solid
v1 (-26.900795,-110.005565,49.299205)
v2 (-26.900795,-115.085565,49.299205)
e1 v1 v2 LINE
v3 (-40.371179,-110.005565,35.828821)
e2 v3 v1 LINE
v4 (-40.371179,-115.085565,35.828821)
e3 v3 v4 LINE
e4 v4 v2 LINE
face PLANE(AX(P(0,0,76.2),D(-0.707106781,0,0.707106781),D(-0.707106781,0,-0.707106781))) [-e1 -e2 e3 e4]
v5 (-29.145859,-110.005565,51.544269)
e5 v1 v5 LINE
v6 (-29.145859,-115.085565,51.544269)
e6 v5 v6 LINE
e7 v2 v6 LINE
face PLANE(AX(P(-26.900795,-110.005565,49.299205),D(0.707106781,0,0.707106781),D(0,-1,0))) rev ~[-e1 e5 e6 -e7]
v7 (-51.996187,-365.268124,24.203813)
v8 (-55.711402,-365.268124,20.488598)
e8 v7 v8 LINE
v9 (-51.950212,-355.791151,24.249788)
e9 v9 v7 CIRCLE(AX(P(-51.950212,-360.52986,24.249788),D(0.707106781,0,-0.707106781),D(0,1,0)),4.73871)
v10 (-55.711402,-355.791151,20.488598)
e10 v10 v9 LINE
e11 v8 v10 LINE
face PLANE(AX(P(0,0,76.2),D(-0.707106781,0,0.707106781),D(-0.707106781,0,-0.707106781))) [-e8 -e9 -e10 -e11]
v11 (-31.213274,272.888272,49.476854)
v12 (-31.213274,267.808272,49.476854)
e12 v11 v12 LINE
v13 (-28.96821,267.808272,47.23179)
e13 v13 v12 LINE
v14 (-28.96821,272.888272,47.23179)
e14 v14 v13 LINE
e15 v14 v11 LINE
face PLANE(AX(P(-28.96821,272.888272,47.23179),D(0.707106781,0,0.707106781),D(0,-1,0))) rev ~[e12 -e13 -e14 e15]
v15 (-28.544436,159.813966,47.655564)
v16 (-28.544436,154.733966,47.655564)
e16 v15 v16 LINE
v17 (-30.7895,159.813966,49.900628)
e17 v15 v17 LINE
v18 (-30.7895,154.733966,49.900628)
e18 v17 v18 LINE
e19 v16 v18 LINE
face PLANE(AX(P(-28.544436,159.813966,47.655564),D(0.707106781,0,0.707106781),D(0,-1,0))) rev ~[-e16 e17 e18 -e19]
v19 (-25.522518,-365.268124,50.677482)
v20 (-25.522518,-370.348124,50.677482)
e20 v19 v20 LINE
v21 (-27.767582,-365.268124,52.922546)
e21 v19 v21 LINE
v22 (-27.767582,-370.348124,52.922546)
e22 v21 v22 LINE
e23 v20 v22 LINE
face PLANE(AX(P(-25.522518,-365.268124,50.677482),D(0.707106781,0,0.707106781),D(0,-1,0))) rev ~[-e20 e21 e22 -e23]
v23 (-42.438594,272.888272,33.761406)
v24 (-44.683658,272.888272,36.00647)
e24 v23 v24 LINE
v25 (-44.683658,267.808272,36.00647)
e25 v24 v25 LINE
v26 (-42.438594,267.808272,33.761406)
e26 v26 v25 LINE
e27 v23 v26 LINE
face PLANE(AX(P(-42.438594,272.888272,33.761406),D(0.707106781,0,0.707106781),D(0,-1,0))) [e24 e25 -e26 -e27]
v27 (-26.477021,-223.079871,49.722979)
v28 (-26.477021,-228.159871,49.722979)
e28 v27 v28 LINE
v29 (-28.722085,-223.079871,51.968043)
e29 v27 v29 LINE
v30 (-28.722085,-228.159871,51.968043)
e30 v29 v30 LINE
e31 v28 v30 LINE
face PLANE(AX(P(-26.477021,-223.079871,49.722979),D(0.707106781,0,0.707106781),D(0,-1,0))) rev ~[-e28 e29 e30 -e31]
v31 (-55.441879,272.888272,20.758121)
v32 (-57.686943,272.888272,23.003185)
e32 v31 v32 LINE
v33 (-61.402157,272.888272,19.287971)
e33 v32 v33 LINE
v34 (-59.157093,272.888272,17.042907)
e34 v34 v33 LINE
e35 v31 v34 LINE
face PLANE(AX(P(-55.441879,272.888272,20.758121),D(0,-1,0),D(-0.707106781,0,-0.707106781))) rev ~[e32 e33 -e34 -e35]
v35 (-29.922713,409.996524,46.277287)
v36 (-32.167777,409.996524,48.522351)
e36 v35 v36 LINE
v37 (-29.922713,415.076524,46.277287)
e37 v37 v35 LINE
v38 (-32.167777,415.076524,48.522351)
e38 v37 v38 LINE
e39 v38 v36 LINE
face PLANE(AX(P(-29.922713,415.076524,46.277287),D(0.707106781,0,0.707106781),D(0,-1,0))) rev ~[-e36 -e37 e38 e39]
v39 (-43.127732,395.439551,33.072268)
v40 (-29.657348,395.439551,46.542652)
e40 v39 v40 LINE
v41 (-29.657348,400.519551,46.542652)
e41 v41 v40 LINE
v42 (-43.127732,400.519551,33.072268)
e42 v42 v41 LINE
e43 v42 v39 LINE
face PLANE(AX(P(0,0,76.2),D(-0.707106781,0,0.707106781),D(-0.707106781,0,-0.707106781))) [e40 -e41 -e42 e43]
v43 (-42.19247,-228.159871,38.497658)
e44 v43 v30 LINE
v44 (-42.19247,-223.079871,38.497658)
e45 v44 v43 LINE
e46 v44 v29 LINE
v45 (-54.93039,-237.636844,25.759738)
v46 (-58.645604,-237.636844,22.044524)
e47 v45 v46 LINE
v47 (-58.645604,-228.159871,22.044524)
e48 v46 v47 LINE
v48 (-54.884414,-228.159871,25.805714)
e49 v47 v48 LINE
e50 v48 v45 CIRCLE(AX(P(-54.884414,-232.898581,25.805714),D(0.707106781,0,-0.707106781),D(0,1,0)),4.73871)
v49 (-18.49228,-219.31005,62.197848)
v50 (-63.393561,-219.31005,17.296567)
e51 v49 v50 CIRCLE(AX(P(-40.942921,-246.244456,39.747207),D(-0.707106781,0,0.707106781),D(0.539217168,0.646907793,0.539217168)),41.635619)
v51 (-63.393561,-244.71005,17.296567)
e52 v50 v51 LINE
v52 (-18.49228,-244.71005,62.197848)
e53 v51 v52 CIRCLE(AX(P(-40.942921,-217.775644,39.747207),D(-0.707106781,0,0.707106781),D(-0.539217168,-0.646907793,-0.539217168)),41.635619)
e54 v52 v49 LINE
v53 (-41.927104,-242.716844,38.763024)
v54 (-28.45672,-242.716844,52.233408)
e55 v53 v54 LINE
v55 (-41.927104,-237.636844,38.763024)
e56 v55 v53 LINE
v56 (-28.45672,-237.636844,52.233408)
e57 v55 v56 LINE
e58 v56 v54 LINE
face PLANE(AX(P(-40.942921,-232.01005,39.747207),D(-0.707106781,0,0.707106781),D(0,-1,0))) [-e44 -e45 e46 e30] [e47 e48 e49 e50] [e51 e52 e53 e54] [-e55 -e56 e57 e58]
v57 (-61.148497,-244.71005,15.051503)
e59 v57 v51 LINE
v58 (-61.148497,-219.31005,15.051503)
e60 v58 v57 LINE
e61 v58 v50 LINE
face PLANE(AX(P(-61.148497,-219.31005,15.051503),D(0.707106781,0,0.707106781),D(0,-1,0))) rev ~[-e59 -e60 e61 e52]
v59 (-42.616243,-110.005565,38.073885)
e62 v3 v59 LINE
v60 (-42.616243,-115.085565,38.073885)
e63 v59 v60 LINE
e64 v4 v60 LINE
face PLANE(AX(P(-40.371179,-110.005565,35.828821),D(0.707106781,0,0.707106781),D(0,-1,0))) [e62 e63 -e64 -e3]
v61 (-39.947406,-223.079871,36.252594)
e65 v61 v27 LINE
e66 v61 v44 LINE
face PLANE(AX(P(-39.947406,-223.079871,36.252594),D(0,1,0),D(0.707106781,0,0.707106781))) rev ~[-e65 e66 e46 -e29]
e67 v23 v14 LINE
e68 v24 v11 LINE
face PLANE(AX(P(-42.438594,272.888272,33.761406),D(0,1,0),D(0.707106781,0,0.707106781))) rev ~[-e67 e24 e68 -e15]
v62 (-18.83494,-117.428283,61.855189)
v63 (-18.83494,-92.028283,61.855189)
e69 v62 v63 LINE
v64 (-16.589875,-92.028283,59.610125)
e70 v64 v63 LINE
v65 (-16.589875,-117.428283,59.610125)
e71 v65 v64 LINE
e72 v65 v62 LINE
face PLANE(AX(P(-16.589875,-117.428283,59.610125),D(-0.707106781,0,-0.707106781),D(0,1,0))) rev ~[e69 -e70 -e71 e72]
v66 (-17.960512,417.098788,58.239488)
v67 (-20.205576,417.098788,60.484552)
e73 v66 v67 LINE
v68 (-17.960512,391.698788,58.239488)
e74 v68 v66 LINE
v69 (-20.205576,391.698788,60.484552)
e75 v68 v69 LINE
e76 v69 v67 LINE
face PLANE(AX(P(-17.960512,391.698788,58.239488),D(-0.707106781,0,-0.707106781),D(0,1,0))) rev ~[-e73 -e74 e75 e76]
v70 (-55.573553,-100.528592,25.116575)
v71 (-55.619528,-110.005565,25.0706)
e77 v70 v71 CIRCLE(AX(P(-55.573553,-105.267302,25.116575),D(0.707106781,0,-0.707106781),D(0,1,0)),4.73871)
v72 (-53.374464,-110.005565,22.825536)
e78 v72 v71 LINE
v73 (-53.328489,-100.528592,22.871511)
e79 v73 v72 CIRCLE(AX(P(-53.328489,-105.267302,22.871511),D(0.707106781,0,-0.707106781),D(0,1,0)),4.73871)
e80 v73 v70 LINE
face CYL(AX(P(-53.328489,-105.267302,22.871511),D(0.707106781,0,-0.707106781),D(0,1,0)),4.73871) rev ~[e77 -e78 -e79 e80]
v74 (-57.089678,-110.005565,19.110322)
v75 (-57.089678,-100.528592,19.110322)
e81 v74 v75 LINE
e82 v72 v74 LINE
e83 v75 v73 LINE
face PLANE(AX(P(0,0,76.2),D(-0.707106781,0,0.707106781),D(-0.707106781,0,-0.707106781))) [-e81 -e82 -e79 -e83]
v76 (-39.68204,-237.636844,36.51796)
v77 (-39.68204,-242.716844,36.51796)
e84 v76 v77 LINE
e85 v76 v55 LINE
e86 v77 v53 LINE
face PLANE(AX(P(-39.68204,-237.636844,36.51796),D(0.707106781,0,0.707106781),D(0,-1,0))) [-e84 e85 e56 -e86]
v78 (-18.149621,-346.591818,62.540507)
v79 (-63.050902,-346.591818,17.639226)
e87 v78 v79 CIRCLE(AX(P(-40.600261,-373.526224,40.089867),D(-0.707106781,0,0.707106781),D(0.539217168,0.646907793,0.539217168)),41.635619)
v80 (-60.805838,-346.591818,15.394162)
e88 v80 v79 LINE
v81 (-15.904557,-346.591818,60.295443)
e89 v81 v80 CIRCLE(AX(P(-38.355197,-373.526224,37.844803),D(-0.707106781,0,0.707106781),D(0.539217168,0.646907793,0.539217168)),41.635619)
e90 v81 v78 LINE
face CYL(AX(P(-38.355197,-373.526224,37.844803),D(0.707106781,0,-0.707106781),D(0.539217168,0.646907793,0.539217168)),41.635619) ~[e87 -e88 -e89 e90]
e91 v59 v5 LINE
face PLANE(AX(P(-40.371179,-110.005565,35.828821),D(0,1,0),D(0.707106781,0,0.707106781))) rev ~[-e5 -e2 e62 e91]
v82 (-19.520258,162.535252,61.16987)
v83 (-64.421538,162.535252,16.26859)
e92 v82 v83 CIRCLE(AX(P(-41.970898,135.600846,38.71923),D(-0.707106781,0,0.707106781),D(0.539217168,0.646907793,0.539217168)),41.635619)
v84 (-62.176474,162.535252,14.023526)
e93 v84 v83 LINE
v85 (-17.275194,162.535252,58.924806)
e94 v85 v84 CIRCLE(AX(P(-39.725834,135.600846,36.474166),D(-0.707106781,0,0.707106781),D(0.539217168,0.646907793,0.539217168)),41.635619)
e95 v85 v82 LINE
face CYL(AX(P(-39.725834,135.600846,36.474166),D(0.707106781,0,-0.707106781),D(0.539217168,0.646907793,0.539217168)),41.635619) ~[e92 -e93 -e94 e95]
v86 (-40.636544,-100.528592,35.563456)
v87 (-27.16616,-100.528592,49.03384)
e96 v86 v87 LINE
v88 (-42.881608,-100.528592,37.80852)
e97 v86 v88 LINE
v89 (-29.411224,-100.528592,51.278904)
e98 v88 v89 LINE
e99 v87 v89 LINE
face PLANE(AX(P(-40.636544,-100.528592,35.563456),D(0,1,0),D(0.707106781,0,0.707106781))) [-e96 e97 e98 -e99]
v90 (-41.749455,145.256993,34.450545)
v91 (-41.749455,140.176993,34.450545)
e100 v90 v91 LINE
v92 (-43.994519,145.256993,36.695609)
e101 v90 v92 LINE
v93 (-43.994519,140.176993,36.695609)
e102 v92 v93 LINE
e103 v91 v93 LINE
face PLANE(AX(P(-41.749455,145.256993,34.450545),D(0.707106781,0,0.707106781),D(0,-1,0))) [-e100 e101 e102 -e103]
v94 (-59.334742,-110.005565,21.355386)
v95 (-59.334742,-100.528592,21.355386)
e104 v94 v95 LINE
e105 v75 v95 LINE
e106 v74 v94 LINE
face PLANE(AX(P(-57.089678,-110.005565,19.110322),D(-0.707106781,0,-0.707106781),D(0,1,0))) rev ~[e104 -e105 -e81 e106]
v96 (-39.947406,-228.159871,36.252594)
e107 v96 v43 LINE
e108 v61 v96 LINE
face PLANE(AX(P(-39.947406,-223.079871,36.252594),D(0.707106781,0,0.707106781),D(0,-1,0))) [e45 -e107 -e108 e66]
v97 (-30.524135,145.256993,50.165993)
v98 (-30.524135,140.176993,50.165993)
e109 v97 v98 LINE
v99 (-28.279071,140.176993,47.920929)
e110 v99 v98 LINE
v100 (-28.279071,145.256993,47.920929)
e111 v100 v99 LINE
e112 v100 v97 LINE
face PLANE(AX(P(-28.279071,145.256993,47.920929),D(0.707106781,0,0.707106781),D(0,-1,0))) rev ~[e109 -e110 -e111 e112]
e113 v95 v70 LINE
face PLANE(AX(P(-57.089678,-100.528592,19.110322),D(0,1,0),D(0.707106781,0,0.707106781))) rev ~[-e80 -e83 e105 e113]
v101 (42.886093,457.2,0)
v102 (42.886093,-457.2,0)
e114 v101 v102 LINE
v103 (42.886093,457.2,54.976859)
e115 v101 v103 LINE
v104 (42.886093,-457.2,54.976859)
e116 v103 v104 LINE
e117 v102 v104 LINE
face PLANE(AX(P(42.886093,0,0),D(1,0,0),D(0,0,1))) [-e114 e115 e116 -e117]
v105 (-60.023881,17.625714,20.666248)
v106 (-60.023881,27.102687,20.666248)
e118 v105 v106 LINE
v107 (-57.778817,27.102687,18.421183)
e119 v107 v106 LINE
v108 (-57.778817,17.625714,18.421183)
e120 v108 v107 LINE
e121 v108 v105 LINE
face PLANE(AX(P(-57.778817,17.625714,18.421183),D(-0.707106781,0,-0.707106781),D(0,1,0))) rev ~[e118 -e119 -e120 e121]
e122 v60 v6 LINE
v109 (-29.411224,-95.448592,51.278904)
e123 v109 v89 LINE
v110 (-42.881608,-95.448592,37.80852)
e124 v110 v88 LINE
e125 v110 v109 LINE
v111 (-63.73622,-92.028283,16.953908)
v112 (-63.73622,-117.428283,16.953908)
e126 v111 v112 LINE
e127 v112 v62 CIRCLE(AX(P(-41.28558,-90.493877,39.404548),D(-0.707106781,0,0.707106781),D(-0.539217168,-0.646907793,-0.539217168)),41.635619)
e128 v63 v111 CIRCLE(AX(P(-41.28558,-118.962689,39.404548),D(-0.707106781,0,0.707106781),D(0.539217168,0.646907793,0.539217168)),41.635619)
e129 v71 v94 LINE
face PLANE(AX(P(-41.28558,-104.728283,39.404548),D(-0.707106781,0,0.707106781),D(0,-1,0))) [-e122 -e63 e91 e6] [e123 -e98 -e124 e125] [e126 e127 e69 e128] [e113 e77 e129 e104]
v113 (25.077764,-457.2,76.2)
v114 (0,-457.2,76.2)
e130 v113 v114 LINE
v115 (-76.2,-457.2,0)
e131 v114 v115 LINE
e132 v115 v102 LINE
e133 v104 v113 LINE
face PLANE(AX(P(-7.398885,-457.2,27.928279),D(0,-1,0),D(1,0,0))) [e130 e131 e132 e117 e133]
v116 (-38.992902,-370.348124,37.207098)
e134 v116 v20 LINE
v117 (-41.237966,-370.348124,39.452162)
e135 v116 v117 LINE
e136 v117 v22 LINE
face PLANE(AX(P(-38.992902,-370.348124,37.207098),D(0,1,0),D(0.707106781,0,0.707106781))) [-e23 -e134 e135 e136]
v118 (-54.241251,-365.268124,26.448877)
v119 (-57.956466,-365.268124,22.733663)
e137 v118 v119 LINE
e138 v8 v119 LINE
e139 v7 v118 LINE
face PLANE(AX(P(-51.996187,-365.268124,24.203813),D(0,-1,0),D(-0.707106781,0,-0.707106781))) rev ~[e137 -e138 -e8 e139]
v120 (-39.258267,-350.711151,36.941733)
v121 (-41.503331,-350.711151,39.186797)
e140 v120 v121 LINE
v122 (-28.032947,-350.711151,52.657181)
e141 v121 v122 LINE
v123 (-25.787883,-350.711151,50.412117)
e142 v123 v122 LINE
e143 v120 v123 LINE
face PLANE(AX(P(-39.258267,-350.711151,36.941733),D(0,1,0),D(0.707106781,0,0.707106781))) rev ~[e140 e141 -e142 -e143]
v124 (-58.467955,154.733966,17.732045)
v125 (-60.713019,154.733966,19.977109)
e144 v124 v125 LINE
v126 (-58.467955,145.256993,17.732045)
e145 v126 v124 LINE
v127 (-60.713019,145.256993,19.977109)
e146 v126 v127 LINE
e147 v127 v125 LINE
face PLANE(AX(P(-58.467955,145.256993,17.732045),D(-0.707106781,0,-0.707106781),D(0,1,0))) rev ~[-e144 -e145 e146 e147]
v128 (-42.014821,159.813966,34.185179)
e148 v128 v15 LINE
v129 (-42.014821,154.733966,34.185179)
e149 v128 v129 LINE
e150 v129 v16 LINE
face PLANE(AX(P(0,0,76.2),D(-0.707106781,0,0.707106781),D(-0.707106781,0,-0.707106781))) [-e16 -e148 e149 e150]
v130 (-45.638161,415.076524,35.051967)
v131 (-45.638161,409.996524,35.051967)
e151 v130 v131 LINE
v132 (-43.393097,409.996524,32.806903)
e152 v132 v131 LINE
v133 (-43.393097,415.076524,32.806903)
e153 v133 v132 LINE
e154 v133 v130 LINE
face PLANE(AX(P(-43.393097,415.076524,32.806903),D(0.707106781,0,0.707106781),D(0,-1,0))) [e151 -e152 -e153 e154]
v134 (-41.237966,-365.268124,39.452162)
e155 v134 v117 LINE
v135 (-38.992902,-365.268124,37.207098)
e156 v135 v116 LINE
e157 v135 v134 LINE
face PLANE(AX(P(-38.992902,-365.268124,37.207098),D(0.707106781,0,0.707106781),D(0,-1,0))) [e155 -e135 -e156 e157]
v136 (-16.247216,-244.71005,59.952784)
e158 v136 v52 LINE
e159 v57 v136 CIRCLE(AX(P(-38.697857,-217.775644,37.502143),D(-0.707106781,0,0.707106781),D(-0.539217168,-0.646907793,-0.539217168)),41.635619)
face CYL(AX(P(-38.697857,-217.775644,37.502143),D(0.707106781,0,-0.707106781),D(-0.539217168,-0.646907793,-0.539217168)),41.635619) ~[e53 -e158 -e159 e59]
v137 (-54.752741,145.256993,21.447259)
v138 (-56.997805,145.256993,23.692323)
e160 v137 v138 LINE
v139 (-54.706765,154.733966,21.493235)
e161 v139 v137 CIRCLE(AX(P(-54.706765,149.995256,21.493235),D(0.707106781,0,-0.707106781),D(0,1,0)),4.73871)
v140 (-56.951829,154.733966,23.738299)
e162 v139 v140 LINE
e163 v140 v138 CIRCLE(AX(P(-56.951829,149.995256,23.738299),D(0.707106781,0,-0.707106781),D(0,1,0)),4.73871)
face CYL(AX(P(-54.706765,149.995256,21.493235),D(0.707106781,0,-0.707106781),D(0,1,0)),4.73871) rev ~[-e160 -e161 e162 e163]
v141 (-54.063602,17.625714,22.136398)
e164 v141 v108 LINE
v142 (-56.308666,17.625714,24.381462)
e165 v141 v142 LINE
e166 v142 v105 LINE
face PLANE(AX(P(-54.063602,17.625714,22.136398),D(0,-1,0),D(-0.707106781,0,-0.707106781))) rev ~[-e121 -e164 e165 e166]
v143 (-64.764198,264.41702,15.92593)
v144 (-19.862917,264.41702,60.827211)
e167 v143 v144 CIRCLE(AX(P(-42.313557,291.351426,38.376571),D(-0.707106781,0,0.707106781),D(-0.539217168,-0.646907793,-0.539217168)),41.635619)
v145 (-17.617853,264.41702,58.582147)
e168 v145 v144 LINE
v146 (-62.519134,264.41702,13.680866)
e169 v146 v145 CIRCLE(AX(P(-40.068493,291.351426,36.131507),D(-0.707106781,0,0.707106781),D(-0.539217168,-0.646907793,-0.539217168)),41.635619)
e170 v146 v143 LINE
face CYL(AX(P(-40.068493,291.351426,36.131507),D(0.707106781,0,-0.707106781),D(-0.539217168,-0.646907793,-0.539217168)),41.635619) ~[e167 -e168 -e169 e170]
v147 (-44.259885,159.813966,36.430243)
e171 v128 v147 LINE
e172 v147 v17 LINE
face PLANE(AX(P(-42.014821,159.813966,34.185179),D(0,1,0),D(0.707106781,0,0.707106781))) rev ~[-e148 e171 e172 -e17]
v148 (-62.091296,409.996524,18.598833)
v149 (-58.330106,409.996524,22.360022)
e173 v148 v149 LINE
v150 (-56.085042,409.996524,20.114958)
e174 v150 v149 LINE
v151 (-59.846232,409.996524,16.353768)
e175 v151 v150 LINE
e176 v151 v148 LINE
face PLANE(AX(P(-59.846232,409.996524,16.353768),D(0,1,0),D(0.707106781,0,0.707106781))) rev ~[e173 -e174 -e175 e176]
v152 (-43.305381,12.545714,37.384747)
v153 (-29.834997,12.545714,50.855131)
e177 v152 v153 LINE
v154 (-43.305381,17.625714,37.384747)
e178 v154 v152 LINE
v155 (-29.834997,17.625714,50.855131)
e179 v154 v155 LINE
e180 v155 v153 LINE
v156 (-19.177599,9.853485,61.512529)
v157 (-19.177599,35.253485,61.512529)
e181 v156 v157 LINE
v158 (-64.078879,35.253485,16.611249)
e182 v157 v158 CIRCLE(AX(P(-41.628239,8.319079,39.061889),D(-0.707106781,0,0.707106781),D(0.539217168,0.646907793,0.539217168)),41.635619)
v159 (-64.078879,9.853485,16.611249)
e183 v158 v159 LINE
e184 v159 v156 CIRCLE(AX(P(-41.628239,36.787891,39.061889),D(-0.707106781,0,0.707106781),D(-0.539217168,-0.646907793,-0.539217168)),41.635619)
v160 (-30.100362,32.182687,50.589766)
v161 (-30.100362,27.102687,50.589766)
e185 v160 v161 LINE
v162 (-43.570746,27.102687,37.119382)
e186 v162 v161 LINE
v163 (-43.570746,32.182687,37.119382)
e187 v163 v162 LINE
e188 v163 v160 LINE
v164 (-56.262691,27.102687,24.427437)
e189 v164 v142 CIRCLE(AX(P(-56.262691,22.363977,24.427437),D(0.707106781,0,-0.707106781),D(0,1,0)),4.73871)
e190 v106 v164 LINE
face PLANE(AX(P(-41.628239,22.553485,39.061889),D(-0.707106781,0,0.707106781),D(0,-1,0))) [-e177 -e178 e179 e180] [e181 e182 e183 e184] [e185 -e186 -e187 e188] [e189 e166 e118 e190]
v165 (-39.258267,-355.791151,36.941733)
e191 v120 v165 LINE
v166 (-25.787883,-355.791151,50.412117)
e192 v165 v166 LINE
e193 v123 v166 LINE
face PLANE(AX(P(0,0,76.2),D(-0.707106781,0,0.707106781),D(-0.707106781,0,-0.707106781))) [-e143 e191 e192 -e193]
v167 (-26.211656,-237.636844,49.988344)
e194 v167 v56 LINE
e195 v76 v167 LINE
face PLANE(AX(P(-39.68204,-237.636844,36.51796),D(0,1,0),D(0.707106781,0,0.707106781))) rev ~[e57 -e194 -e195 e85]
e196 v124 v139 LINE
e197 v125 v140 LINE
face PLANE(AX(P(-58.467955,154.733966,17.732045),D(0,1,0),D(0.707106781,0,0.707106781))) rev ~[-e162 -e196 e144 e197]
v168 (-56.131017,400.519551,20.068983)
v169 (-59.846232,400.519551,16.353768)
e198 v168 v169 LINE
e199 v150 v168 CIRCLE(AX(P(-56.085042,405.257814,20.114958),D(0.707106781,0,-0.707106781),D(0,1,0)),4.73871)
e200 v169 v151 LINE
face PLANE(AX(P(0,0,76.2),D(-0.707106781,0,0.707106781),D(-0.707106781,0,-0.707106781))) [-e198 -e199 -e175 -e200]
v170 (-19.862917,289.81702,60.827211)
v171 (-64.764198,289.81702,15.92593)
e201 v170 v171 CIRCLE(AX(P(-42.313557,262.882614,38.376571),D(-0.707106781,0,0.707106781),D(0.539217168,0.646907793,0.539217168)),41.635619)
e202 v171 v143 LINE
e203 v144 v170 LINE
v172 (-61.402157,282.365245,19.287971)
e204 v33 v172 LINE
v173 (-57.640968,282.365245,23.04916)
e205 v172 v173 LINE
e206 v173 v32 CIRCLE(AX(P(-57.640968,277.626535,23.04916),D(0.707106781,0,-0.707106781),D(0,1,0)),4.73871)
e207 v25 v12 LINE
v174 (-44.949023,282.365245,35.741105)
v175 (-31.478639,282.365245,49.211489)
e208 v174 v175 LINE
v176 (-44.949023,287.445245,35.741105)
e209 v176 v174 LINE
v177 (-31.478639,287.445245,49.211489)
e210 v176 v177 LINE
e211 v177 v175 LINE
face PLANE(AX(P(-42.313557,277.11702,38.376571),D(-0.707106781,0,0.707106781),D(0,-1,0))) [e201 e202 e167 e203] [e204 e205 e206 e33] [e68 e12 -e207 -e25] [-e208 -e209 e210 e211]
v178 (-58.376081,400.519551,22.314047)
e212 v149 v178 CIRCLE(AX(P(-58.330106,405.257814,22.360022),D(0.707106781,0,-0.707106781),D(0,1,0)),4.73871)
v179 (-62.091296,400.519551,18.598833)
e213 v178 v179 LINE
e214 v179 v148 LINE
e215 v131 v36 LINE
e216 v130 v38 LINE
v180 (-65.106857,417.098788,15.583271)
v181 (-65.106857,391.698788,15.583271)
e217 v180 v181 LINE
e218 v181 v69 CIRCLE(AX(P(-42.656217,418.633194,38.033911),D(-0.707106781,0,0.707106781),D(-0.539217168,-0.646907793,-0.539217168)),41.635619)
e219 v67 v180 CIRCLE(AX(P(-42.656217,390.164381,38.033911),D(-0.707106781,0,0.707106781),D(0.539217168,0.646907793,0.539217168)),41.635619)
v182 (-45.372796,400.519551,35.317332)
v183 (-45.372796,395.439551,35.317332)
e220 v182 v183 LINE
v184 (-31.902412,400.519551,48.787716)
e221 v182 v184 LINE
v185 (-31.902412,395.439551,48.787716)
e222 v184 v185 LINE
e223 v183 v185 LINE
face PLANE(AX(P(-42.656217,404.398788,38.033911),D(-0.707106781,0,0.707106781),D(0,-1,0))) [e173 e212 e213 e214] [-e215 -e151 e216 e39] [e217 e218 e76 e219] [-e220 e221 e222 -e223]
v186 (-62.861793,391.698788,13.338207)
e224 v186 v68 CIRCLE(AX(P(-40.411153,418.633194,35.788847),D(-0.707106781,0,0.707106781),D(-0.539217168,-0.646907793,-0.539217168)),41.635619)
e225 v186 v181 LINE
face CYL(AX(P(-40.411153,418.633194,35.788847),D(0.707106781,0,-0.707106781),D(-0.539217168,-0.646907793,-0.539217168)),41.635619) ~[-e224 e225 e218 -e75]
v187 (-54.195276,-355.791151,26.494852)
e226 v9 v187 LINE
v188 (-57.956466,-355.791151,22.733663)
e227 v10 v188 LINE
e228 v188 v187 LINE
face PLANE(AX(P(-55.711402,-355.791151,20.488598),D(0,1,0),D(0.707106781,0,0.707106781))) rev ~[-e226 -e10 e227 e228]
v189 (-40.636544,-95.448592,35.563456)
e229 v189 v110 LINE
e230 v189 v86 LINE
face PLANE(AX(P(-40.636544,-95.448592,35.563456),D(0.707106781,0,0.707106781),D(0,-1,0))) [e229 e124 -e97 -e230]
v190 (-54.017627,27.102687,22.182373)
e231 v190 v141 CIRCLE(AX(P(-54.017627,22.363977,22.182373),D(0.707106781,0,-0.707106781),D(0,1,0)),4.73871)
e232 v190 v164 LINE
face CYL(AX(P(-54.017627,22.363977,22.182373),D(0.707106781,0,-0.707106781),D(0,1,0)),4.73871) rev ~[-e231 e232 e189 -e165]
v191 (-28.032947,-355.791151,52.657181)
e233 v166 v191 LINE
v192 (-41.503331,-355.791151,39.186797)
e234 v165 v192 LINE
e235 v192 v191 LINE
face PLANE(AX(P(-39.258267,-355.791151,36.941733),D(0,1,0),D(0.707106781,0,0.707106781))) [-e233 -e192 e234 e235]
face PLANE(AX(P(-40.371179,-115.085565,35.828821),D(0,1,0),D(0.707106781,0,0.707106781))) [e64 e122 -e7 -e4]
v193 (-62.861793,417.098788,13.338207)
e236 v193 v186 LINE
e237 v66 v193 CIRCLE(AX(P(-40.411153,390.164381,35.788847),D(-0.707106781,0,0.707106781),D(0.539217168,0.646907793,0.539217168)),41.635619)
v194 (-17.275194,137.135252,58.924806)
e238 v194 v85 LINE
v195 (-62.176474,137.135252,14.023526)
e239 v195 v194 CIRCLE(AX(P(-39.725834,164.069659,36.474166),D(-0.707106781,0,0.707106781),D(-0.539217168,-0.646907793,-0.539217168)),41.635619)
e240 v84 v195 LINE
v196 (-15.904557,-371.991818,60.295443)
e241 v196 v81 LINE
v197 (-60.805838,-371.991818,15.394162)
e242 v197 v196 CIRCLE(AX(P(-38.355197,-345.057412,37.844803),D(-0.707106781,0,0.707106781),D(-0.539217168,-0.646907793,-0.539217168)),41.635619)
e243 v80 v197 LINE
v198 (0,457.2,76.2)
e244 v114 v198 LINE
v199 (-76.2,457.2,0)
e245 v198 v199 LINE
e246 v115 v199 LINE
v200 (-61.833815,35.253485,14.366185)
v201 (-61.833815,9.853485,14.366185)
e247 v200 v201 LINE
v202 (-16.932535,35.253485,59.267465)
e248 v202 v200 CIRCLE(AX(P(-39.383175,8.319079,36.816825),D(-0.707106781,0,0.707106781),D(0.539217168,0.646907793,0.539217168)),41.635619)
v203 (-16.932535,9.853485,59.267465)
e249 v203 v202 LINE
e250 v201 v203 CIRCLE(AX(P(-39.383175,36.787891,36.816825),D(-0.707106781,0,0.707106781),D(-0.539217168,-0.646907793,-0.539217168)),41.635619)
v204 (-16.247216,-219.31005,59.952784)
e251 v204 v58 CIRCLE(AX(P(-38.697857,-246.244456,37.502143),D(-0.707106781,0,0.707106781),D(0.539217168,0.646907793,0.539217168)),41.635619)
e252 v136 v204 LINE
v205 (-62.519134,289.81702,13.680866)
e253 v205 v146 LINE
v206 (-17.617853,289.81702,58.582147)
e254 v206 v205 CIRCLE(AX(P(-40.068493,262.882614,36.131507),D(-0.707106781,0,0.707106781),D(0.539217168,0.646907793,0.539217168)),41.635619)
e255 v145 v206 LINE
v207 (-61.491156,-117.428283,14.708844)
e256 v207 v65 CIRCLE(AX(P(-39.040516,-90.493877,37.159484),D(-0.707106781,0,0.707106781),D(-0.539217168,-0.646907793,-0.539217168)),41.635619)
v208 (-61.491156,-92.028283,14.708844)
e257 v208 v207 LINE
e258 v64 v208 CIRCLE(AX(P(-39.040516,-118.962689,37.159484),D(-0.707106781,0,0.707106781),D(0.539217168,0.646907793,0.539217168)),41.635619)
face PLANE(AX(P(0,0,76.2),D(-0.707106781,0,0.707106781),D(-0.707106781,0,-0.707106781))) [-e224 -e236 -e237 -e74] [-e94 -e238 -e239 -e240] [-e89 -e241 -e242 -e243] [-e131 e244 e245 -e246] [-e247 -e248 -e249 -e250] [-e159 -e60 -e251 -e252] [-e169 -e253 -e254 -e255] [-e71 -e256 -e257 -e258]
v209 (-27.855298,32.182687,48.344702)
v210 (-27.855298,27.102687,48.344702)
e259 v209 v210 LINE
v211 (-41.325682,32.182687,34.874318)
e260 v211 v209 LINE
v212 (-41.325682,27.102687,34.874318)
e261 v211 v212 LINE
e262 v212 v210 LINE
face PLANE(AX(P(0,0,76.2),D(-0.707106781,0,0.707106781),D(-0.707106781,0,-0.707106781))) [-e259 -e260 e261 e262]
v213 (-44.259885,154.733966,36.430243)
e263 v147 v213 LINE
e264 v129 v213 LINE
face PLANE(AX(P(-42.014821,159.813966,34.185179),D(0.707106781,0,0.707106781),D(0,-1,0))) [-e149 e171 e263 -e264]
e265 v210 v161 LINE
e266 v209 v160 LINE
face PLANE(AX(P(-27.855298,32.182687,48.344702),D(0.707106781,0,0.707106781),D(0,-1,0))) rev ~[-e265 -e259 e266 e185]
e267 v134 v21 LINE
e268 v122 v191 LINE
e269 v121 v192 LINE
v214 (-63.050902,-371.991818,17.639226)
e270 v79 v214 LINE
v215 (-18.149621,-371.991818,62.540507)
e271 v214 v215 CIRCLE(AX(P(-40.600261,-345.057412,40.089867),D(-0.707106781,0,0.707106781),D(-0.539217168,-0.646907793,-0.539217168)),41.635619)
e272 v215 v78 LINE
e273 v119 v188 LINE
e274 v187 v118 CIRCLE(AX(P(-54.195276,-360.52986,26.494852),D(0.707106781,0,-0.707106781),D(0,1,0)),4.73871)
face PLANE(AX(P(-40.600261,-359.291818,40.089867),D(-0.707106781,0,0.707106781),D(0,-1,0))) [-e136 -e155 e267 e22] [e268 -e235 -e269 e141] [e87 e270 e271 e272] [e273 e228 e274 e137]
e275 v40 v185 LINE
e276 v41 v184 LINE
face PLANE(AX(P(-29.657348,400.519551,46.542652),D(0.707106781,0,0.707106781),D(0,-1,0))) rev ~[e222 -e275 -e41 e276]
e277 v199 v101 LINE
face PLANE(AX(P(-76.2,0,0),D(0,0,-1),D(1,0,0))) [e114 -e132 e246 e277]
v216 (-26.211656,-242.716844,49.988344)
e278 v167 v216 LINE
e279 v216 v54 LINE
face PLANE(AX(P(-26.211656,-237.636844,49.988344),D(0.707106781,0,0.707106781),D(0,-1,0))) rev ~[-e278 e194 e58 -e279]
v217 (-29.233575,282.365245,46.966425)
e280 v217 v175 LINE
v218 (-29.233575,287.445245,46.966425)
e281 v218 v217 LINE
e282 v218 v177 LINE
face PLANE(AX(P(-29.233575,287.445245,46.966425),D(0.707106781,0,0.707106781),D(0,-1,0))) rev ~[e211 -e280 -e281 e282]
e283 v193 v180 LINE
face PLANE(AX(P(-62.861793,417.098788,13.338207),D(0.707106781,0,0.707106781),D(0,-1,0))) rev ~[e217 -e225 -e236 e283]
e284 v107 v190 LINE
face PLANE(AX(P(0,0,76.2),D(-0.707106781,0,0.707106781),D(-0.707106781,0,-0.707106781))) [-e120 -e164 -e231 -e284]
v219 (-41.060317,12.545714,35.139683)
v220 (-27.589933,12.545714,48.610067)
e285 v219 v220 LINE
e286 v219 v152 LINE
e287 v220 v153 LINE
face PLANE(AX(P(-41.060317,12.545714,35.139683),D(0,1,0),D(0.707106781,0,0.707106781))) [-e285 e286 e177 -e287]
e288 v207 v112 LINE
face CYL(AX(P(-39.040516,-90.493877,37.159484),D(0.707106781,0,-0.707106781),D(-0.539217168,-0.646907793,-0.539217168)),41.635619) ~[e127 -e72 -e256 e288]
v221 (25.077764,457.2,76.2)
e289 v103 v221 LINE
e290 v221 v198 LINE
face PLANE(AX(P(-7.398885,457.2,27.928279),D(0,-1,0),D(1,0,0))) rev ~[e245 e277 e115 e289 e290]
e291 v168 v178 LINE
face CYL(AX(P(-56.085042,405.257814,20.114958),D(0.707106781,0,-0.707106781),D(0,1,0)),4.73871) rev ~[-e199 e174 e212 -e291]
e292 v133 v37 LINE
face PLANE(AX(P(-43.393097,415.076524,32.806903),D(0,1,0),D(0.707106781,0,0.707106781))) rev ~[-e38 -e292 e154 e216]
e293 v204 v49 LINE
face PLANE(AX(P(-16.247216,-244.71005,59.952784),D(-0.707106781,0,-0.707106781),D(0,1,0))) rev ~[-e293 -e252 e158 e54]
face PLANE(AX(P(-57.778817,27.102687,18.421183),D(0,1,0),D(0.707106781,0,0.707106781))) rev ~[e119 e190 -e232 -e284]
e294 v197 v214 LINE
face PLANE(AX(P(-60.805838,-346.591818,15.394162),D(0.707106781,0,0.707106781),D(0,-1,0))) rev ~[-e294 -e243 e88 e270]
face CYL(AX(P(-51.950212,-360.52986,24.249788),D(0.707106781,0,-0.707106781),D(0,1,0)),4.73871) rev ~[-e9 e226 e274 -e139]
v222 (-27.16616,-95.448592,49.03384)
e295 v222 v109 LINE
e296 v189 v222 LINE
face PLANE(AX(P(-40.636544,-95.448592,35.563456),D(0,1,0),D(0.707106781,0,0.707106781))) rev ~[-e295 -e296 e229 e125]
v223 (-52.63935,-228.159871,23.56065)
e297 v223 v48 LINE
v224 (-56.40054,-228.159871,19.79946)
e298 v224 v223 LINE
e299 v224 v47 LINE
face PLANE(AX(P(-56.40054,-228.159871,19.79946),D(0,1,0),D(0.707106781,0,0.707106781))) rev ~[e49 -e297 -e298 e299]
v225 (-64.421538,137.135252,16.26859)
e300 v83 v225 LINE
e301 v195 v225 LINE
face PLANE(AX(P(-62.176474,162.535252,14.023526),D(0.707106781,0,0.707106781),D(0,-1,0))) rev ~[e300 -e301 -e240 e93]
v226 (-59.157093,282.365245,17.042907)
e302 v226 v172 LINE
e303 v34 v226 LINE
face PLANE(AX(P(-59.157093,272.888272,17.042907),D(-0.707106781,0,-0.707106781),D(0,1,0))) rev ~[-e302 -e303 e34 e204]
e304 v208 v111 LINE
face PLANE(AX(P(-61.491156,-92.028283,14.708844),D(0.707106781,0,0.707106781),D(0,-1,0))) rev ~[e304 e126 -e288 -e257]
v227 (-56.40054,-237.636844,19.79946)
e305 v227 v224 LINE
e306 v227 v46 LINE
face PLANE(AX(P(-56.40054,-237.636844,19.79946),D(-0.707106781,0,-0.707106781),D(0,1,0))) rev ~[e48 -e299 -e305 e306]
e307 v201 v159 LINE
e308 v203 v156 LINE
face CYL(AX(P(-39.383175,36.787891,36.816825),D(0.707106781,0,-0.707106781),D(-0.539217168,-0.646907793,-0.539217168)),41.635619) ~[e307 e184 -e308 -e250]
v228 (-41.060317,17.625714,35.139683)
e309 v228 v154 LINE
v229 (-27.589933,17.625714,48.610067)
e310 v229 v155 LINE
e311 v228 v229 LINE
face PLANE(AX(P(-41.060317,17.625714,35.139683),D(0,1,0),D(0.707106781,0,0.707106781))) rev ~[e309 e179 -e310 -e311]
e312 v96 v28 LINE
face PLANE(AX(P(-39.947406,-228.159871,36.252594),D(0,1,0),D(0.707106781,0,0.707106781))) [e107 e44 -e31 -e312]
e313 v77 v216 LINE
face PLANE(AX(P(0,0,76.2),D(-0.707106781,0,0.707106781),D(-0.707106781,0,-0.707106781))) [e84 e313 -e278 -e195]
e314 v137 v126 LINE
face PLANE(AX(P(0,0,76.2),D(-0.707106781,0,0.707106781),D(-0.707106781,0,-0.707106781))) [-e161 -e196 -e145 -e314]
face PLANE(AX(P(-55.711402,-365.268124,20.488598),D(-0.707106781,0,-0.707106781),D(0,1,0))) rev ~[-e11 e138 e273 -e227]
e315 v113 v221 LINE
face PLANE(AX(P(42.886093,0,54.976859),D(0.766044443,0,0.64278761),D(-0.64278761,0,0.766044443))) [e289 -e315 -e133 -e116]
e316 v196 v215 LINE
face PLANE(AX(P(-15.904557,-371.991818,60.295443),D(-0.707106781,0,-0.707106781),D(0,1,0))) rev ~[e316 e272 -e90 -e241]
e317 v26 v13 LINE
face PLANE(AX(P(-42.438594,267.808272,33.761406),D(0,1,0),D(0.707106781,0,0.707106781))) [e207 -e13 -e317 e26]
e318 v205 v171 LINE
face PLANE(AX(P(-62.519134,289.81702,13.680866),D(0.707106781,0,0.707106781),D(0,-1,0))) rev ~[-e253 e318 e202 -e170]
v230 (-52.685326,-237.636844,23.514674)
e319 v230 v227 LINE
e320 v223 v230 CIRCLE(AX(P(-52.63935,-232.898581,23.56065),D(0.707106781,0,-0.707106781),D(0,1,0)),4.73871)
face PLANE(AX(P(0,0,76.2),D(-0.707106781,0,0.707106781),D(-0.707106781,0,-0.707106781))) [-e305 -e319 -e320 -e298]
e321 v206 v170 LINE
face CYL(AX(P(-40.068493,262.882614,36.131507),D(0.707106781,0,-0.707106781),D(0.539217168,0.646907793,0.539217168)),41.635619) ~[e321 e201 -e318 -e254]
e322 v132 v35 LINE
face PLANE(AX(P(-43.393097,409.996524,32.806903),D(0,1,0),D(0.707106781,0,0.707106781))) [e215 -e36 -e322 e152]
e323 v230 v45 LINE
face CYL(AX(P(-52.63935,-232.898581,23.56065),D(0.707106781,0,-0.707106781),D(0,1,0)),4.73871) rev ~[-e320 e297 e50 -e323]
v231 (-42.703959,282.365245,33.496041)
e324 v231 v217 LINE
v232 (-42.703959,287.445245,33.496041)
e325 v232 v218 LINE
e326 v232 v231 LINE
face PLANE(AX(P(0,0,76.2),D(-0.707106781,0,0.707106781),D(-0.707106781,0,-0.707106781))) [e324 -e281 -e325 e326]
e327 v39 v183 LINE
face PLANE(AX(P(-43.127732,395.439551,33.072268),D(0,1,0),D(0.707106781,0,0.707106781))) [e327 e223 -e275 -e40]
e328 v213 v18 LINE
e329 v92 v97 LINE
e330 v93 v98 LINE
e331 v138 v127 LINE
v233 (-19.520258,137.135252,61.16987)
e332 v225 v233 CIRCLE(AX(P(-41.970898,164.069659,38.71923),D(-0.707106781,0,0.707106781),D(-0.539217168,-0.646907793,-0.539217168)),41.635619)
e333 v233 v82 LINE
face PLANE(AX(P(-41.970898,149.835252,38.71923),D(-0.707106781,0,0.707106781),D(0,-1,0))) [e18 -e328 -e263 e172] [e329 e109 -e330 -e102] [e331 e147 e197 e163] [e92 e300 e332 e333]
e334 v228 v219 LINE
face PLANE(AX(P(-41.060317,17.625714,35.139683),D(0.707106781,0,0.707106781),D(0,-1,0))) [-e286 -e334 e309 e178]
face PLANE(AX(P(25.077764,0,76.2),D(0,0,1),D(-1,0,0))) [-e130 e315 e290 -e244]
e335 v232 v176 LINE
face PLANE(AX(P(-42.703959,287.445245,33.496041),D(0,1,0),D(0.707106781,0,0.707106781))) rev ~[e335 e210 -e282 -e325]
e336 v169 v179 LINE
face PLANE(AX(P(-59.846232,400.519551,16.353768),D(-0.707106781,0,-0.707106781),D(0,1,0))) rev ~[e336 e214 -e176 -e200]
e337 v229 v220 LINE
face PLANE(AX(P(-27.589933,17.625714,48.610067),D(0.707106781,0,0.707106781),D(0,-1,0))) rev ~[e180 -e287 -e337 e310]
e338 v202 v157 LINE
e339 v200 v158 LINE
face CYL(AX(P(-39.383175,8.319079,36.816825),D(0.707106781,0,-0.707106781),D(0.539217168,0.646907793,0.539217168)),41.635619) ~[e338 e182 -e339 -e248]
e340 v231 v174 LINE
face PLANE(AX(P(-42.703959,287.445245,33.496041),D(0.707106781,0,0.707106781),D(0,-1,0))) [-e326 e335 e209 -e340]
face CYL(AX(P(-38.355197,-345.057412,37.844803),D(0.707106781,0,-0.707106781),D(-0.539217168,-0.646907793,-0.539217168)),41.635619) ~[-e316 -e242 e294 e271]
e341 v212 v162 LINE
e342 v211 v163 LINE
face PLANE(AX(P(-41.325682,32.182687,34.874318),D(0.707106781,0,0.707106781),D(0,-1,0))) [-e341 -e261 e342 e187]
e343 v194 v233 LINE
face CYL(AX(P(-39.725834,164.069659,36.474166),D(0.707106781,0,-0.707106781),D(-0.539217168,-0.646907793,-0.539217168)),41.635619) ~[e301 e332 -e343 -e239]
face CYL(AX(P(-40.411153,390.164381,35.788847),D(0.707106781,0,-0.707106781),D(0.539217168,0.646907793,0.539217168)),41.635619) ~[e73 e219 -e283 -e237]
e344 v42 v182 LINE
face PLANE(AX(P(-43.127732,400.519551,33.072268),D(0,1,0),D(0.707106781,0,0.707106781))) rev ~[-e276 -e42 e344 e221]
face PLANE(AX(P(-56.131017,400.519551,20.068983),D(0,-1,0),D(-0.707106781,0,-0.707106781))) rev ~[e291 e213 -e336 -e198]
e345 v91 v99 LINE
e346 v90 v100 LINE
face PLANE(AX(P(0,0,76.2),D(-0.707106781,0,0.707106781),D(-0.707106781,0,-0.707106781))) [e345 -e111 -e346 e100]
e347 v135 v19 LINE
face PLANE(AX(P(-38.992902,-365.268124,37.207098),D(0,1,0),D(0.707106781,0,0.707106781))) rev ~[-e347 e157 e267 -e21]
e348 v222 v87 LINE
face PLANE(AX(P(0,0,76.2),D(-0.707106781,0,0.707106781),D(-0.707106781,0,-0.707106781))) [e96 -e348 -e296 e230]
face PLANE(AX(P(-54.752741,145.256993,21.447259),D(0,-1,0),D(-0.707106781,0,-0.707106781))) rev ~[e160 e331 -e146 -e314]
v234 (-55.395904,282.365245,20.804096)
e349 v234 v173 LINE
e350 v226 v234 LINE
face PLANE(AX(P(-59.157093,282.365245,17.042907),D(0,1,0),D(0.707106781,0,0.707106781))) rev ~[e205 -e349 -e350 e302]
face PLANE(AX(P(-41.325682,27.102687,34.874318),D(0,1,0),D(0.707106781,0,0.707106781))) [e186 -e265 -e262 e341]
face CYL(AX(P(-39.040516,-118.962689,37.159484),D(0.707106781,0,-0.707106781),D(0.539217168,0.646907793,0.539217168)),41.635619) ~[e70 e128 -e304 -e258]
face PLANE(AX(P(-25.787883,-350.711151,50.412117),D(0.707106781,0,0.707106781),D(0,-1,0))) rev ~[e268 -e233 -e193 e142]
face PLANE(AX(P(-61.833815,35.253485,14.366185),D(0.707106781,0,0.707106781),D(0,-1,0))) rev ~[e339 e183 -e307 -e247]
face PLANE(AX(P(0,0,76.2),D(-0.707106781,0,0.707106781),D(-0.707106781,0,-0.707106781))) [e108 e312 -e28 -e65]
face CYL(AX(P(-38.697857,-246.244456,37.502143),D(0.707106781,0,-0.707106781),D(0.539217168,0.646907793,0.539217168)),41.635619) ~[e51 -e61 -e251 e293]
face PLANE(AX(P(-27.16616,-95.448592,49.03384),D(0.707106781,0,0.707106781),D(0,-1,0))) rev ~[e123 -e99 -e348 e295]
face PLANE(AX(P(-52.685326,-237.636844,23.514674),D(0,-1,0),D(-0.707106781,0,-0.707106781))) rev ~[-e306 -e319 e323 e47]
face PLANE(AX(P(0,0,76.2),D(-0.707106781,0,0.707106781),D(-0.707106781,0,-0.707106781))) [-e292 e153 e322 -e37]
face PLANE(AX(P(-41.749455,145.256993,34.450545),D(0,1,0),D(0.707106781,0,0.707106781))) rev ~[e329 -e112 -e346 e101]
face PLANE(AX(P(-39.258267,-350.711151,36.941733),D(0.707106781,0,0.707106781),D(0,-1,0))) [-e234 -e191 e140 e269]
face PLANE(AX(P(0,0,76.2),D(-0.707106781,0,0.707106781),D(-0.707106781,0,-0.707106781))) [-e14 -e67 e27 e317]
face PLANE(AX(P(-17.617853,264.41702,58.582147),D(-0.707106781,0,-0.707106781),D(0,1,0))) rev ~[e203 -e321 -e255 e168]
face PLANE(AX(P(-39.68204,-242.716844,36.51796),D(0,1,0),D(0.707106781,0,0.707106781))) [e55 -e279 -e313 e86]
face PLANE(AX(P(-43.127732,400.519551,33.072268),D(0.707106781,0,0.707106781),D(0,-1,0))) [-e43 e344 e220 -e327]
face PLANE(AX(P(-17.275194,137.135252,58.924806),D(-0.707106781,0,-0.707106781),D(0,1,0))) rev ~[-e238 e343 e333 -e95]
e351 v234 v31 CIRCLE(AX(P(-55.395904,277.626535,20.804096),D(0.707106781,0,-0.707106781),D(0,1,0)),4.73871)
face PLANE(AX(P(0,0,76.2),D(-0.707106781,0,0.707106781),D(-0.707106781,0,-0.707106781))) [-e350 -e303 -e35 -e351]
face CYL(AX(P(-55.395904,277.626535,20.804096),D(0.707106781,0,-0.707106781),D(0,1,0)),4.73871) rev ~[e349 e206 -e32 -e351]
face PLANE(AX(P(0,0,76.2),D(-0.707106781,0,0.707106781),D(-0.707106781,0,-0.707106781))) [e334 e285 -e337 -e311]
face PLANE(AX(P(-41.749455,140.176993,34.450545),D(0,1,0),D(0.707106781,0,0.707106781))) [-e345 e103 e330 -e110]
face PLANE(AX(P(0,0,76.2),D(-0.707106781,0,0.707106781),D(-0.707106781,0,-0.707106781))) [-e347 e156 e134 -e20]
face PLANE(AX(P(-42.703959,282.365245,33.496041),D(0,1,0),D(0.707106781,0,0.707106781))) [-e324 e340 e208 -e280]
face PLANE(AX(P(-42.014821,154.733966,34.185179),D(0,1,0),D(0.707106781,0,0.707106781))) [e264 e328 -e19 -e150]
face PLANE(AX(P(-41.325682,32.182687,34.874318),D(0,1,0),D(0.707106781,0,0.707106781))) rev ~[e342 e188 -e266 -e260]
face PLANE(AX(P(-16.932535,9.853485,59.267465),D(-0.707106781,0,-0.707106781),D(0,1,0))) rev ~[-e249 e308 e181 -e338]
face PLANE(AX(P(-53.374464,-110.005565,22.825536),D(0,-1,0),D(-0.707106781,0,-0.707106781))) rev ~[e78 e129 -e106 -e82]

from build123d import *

# Parameters (mm, degrees)
F1_DEPTH = 457.2
F2_W     = 5.08
F2_H     = 19.05
F3_DEPTH = 3.175


# Not quite as in the source:
# - a length typed as a fraction of an inch, garbled in the dataset ("3 / 203.2 mm" for 3/8 in), is restored


with BuildPart() as f1:
    # F0 (on Front) → F1 (new body, symmetric)
    with BuildSketch(Plane.XZ):
        Polygon((-76.2, 0), (0, 0), (42.8860933474, 0), (42.8860933474, 54.9768594564), (25.0777639449, 76.2), (0, 76.2), align=None)
    extrude(amount=F1_DEPTH, both=True)

    # F2 (on face) → F3 (join)
    with BuildSketch(Plane(origin=(-38.1, 0, 38.1), x_dir=(0, -1, 0), z_dir=(-0.7071067812, 0, 0.7071067812))):
        with BuildLine():
            Line((-391.6987875515, 28.4815367264), (-417.0987875515, 28.4815367264))
            ThreePointArc((-417.0987875515, 28.4815367264), (-431.8, -3.2684632736), (-417.0987875515, -35.0184632736))
            Line((-417.0987875515, -35.0184632736), (-391.6987875515, -35.0184632736))
            ThreePointArc((-391.6987875515, -35.0184632736), (-376.9975751031, -3.2684632736), (-391.6987875515, 28.4815367264))
        make_face()
        with BuildLine():
            Line((-400.5195509719, -30.7538155466), (-409.9965240192, -30.7538155466))
            Line((-409.9965240192, -30.7538155466), (-409.9965240192, -25.4346902415))
            ThreePointArc((-409.9965240192, -25.4346902415), (-405.2253041336, -20.6960921992), (-400.5195509719, -25.4997093556))
            Line((-400.5195509719, -25.4997093556), (-400.5195509719, -30.7538155466))
        make_face(mode=Mode.SUBTRACT)
        with Locations((-412.5365240192, 2.0394300796)):
            Rectangle(F2_W, F2_H, mode=Mode.SUBTRACT)
        with Locations((-397.9795509719, 2.4147130909)):
            Rectangle(F2_W, F2_H, mode=Mode.SUBTRACT)
        with BuildLine():
            Line((-264.41702, 28.96613), (-289.81702, 28.96613))
            ThreePointArc((-289.81702, 28.96613), (-304.5182324485, -2.78387), (-289.81702, -34.53387))
            Line((-289.81702, -34.53387), (-264.41702, -34.53387))
            ThreePointArc((-264.41702, -34.53387), (-249.7158075515, -2.78387), (-264.41702, 28.96613))
        make_face()
        with BuildLine():
            Line((-272.8882718836, -29.7792267651), (-282.365244931, -29.7792267651))
            Line((-282.365244931, -29.7792267651), (-282.365244931, -24.46010146))
            ThreePointArc((-282.365244931, -24.46010146), (-277.5940250453, -19.7215034177), (-272.8882718836, -24.5251205741))
            Line((-272.8882718836, -24.5251205741), (-272.8882718836, -29.7792267651))
        make_face(mode=Mode.SUBTRACT)
        with Locations((-284.905244931, 3.0140188611)):
            Rectangle(F2_W, F2_H, mode=Mode.SUBTRACT)
        with Locations((-270.3482718836, 3.3893018724)):
            Rectangle(F2_W, F2_H, mode=Mode.SUBTRACT)
        with BuildLine():
            Line((-137.1352524485, 29.4507232736), (-162.5352524485, 29.4507232736))
            ThreePointArc((-162.5352524485, 29.4507232736), (-177.2364648969, -2.2992767264), (-162.5352524485, -34.0492767264))
            Line((-162.5352524485, -34.0492767264), (-137.1352524485, -34.0492767264))
            ThreePointArc((-137.1352524485, -34.0492767264), (-122.43404, -2.2992767264), (-137.1352524485, 29.4507232736))
        make_face()
        with BuildLine():
            Line((-145.2569927954, -28.8046379836), (-154.7339658427, -28.8046379836))
            Line((-154.7339658427, -28.8046379836), (-154.7339658427, -23.4855126785))
            ThreePointArc((-154.7339658427, -23.4855126785), (-149.962745957, -18.7469146362), (-145.2569927954, -23.5505317926))
            Line((-145.2569927954, -23.5505317926), (-145.2569927954, -28.8046379836))
        make_face(mode=Mode.SUBTRACT)
        with Locations((-157.2739658427, 3.9886076427)):
            Rectangle(F2_W, F2_H, mode=Mode.SUBTRACT)
        with Locations((-142.7169927954, 4.3638906539)):
            Rectangle(F2_W, F2_H, mode=Mode.SUBTRACT)
        with BuildLine():
            Line((-9.8534848969, 29.9353165472), (-35.2534848969, 29.9353165472))
            ThreePointArc((-35.2534848969, 29.9353165472), (-49.9546973454, -1.8146834528), (-35.2534848969, -33.5646834528))
            Line((-35.2534848969, -33.5646834528), (-9.8534848969, -33.5646834528))
            ThreePointArc((-9.8534848969, -33.5646834528), (4.8477275515, -1.8146834528), (-9.8534848969, 29.9353165472))
        make_face()
        with BuildLine():
            Line((-17.6257137071, -27.8300492021), (-27.1026867544, -27.8300492021))
            Line((-27.1026867544, -27.8300492021), (-27.1026867544, -22.5109238969))
            ThreePointArc((-27.1026867544, -22.5109238969), (-22.3314668688, -17.7723258546), (-17.6257137071, -22.575943011))
            Line((-17.6257137071, -22.575943011), (-17.6257137071, -27.8300492021))
        make_face(mode=Mode.SUBTRACT)
        with Locations((-29.6426867544, 4.9631964242)):
            Rectangle(F2_W, F2_H, mode=Mode.SUBTRACT)
        with Locations((-15.0857137071, 5.3384794355)):
            Rectangle(F2_W, F2_H, mode=Mode.SUBTRACT)
        with BuildLine():
            Line((117.4282826546, 30.4199098208), (92.0282826546, 30.4199098208))
            ThreePointArc((92.0282826546, 30.4199098208), (77.3270702061, -1.3300901792), (92.0282826546, -33.0800901792))
            Line((92.0282826546, -33.0800901792), (117.4282826546, -33.0800901792))
            ThreePointArc((117.4282826546, -33.0800901792), (132.1294951031, -1.3300901792), (117.4282826546, 30.4199098208))
        make_face()
        with BuildLine():
            Line((110.0055653812, -26.8554604205), (100.5285923338, -26.8554604205))
            Line((100.5285923338, -26.8554604205), (100.5285923338, -21.5363351154))
            ThreePointArc((100.5285923338, -21.5363351154), (105.2998122195, -16.7977370731), (110.0055653812, -21.6013542295))
            Line((110.0055653812, -21.6013542295), (110.0055653812, -26.8554604205))
        make_face(mode=Mode.SUBTRACT)
        with Locations((97.9885923338, 5.9377852057)):
            Rectangle(F2_W, F2_H, mode=Mode.SUBTRACT)
        with Locations((112.5455653812, 6.313068217)):
            Rectangle(F2_W, F2_H, mode=Mode.SUBTRACT)
        with BuildLine():
            Line((244.7100502061, 30.9045030943), (219.3100502061, 30.9045030943))
            ThreePointArc((219.3100502061, 30.9045030943), (204.6088377576, -0.8454969057), (219.3100502061, -32.5954969057))
            Line((219.3100502061, -32.5954969057), (244.7100502061, -32.5954969057))
            ThreePointArc((244.7100502061, -32.5954969057), (259.4112626546, -0.8454969057), (244.7100502061, 30.9045030943))
        make_face()
        with BuildLine():
            Line((237.6368444694, -25.880871639), (228.1598714221, -25.880871639))
            Line((228.1598714221, -25.880871639), (228.1598714221, -20.5617463339))
            ThreePointArc((228.1598714221, -20.5617463339), (232.9310913078, -15.8231482916), (237.6368444694, -20.626765448))
            Line((237.6368444694, -20.626765448), (237.6368444694, -25.880871639))
        make_face(mode=Mode.SUBTRACT)
        with Locations((225.6198714221, 6.9123739872)):
            Rectangle(F2_W, F2_H, mode=Mode.SUBTRACT)
        with Locations((240.1768444694, 7.2876569985)):
            Rectangle(F2_W, F2_H, mode=Mode.SUBTRACT)
        with BuildLine():
            Line((371.9918177576, 31.3890963679), (346.5918177576, 31.3890963679))
            ThreePointArc((346.5918177576, 31.3890963679), (331.8906053092, -0.3609036321), (346.5918177576, -32.1109036321))
            Line((346.5918177576, -32.1109036321), (371.9918177576, -32.1109036321))
            ThreePointArc((371.9918177576, -32.1109036321), (386.6930302061, -0.3609036321), (371.9918177576, 31.3890963679))
        make_face()
        with BuildLine():
            Line((365.2681235577, -24.9062828575), (355.7911505104, -24.9062828575))
            Line((355.7911505104, -24.9062828575), (355.7911505104, -19.5871575524))
            ThreePointArc((355.7911505104, -19.5871575524), (360.562370396, -14.8485595101), (365.2681235577, -19.6521766665))
            Line((365.2681235577, -19.6521766665), (365.2681235577, -24.9062828575))
        make_face(mode=Mode.SUBTRACT)
        with Locations((353.2511505104, 7.8869627688)):
            Rectangle(F2_W, F2_H, mode=Mode.SUBTRACT)
        with Locations((367.8081235577, 8.26224578)):
            Rectangle(F2_W, F2_H, mode=Mode.SUBTRACT)
    extrude(amount=F3_DEPTH)


solid = f1.part
